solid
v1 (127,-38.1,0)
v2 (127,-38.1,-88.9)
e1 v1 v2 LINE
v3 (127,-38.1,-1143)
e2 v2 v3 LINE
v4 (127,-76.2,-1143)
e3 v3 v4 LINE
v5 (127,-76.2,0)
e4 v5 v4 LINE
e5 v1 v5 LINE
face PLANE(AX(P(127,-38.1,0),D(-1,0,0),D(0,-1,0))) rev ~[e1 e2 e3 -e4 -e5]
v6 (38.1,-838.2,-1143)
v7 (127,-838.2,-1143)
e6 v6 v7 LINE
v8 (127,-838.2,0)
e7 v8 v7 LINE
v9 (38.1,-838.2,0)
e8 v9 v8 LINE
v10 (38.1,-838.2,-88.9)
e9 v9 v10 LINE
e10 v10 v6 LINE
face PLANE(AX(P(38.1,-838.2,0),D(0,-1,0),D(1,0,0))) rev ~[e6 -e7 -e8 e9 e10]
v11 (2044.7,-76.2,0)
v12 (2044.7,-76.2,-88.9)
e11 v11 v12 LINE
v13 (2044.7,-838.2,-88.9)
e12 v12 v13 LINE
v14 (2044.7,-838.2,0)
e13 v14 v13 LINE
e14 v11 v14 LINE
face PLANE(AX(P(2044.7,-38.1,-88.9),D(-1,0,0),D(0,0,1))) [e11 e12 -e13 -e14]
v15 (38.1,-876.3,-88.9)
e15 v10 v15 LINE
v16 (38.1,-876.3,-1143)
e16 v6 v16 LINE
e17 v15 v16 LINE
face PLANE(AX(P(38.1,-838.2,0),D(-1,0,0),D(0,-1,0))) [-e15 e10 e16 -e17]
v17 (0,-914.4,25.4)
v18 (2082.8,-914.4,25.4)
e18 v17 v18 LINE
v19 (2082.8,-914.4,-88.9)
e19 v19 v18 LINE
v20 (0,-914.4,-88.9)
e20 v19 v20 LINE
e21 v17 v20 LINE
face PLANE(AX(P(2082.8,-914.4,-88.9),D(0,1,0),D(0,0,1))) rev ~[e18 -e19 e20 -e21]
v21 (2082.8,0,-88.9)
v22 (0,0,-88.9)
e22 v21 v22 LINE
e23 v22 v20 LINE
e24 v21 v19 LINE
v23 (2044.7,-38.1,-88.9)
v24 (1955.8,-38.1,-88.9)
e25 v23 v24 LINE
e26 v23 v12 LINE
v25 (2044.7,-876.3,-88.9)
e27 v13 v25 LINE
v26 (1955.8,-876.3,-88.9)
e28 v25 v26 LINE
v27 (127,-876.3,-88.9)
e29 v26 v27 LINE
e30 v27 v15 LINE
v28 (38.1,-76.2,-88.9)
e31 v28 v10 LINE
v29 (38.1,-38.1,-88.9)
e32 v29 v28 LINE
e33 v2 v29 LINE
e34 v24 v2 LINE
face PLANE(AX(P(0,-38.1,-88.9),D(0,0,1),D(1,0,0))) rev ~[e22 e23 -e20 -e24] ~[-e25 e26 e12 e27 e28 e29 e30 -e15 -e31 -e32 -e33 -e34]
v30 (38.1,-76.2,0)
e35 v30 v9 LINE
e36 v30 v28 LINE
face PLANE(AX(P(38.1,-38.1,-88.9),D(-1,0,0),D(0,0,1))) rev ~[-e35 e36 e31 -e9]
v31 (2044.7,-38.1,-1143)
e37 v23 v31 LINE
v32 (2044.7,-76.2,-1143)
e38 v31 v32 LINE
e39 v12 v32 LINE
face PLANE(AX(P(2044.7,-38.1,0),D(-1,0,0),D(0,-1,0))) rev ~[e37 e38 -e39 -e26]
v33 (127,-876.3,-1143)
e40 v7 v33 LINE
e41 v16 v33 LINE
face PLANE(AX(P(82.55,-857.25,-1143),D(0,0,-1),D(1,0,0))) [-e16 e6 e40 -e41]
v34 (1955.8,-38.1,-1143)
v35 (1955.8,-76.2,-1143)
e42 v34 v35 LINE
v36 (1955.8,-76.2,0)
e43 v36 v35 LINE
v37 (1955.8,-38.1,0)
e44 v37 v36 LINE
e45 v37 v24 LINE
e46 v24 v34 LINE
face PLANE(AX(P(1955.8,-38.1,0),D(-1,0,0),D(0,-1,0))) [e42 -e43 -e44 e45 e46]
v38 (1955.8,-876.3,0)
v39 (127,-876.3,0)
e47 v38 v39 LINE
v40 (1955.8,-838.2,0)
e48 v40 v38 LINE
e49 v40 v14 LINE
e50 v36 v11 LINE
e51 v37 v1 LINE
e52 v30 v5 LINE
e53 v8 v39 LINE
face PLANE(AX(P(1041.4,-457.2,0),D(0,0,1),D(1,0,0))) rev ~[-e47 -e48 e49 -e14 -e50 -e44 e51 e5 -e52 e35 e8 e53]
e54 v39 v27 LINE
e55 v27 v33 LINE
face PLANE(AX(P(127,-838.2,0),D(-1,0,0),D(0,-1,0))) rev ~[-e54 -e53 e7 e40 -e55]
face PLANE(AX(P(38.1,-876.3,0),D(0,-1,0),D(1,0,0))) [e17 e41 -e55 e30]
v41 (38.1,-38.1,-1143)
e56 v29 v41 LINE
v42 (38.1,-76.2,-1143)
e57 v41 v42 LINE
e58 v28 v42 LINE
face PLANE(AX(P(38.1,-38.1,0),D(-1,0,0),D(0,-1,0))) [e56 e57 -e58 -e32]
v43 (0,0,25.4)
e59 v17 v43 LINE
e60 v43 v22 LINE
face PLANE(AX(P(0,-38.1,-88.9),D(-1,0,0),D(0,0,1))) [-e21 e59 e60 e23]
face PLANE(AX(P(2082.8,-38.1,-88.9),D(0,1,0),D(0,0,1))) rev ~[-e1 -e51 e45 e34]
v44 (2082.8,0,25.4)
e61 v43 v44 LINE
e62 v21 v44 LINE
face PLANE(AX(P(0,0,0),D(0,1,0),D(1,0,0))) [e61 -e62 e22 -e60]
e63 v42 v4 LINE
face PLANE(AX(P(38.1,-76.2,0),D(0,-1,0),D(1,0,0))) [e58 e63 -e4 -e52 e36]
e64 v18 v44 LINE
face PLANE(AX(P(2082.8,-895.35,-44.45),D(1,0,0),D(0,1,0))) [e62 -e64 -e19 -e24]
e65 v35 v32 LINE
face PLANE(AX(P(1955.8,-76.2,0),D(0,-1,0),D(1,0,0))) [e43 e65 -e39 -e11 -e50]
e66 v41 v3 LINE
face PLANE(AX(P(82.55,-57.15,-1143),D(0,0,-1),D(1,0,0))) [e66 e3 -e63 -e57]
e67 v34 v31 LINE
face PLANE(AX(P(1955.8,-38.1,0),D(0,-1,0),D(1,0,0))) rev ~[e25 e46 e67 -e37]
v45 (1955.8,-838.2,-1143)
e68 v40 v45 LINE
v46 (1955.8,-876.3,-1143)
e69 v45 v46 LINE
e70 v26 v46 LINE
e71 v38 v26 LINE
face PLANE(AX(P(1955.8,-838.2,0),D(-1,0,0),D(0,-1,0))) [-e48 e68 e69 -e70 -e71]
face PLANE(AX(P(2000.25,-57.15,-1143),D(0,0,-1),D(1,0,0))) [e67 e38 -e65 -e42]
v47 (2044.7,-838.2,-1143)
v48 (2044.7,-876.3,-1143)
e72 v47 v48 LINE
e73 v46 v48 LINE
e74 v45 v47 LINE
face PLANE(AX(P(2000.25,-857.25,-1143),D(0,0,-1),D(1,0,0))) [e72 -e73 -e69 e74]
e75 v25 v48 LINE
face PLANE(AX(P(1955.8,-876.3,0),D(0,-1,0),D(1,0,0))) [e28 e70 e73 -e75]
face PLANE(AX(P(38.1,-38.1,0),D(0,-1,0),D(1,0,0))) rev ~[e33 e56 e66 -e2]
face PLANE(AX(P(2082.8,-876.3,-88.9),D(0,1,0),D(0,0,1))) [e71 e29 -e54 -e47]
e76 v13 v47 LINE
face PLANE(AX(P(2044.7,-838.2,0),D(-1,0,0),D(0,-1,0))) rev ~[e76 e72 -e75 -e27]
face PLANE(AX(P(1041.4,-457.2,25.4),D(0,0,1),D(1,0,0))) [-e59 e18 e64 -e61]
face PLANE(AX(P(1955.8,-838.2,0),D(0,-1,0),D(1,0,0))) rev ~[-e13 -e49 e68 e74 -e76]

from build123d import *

# Parameters (mm, degrees)
F0_W     = 2082.8
F0_H     = 914.4
F1_DEPTH = 25.4
F2_W     = 38.1
F2_H     = 88.9
F3_DEPTH = 2082.8
F4_W     = 38.1
F4_H     = 88.9
F5_DEPTH = 838.2
F6_W     = 88.9
F6_H     = 38.1
F7_DEPTH = 1143


# Not quite as in the source:
# - a feature names something its author has since deleted; it is built from what else it names


with BuildPart() as f1:
    # F0 (on Top) → F1 (new body)
    with BuildSketch(Plane.XY):
        with Locations((1041.4, -457.2)):
            Rectangle(F0_W, F0_H)
    extrude(amount=F1_DEPTH)

    # F2 (on face) → F3 (join, through all)
    with BuildSketch(Plane.YZ.offset(2082.8)):
        with Locations((-895.35, -44.45)):
            Rectangle(F2_W, F2_H)
        with Locations((-19.05, -44.45)):
            Rectangle(F2_W, F2_H)
    extrude(amount=-F3_DEPTH)

    # F4 (on face) → F5 (join, through all)
    with BuildSketch(Plane.XZ.offset(38.1)):
        with Locations((19.05, -44.45)):
            Rectangle(F4_W, F4_H)
        with Locations((2063.75, -44.45)):
            Rectangle(F4_W, F4_H)
    extrude(amount=F5_DEPTH)

    # F6 (on face) → F7 (join)
    with BuildSketch(Plane(origin=(0, 0, 0), x_dir=(1, 0, 0), z_dir=(0, 0, -1))):
        with Locations((82.55, 857.25)):
            Rectangle(F6_W, F6_H)
        with Locations((82.55, 57.15)):
            Rectangle(F6_W, F6_H)
        with Locations((2000.25, 57.15)):
            Rectangle(F6_W, F6_H)
        with Locations((2000.25, 857.25)):
            Rectangle(F6_W, F6_H)
    extrude(amount=F7_DEPTH)


solid = f1.part
